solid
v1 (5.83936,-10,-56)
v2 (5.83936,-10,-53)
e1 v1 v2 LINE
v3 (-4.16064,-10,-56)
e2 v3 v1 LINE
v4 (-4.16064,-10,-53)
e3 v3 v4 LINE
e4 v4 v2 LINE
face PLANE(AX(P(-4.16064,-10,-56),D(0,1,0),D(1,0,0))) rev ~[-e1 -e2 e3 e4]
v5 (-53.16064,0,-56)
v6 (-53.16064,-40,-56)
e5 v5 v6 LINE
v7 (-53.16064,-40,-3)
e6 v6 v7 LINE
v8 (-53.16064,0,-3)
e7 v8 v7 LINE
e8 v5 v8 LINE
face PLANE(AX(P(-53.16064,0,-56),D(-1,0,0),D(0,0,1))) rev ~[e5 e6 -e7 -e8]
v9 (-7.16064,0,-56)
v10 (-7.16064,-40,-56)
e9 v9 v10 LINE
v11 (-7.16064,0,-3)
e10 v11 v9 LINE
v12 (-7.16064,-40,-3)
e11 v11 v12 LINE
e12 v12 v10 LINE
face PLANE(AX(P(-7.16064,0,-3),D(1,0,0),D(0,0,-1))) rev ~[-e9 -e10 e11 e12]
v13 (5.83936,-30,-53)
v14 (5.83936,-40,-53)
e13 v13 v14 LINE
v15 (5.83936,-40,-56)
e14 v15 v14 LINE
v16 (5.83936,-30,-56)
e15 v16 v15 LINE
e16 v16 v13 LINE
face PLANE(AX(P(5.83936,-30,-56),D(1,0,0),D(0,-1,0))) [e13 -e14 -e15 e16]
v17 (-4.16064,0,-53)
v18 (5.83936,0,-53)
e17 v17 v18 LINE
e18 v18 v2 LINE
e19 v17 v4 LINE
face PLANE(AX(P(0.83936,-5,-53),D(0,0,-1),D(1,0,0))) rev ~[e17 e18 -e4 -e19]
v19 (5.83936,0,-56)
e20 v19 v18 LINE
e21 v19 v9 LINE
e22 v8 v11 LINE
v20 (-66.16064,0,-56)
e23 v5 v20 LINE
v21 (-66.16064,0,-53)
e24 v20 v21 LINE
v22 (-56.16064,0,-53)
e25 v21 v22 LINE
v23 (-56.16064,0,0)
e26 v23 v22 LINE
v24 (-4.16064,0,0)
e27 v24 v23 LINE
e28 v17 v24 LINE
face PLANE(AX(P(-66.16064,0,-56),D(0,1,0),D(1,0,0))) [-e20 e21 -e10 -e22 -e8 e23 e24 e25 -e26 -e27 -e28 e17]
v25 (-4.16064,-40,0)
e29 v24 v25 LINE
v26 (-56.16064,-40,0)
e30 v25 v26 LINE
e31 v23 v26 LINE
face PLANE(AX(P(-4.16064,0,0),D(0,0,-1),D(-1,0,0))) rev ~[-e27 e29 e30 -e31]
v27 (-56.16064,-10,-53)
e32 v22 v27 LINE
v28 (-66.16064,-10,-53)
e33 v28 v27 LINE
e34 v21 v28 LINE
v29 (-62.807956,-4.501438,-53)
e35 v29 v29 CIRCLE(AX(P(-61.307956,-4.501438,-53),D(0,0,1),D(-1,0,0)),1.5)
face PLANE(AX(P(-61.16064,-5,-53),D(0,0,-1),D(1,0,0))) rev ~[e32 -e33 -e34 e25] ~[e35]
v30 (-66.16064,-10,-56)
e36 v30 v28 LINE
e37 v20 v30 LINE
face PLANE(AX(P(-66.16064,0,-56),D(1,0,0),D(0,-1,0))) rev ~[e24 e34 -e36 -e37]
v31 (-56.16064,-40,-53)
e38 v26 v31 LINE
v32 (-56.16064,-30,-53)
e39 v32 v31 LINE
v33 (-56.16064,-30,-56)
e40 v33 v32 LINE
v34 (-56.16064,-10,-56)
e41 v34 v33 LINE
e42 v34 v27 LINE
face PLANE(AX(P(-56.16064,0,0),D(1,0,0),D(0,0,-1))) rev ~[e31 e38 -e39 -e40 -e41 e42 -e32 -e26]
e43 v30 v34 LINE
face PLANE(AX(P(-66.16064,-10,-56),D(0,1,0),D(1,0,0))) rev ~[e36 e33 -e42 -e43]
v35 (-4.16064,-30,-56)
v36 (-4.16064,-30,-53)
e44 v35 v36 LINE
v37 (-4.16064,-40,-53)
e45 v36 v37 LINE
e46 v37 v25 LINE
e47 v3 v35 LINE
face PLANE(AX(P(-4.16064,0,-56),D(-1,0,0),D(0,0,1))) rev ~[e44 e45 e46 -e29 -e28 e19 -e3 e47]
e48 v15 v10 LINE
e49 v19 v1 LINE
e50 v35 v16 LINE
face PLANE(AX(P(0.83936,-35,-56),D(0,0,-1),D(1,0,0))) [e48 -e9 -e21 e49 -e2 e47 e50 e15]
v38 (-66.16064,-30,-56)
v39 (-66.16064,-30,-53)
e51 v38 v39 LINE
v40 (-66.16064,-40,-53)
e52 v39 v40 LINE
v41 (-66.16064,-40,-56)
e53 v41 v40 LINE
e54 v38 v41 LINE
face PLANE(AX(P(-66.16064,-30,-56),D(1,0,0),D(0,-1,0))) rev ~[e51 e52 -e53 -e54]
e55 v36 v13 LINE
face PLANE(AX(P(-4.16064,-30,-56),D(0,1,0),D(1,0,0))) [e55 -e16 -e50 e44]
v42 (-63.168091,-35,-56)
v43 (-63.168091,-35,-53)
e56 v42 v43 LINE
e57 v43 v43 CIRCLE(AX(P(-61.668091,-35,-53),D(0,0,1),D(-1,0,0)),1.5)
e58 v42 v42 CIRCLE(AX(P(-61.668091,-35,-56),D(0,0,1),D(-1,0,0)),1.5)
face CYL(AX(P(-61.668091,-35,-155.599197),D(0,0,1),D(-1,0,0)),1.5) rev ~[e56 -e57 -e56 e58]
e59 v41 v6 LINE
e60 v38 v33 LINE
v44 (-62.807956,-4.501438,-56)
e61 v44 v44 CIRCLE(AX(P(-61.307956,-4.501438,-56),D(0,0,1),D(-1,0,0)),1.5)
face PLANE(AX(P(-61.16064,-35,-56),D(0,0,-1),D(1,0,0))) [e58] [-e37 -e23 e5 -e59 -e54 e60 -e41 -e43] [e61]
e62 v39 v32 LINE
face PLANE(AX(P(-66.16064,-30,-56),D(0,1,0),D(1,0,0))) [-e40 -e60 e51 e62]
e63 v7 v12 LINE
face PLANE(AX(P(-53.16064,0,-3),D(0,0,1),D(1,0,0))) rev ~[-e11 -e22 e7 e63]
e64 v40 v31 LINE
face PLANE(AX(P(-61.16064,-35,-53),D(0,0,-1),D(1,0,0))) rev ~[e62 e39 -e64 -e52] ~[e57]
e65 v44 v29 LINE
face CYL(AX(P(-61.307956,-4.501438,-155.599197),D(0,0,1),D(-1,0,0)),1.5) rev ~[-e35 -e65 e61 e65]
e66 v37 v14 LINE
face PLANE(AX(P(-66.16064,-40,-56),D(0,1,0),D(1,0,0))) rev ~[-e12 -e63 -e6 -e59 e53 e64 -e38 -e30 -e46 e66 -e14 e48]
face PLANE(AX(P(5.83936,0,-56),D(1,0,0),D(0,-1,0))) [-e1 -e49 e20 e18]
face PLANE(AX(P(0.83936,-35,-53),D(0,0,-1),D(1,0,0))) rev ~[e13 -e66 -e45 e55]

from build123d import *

# Parameters (mm, degrees)
F1_DEPTH = 40
F3_W     = 10
F3_H     = 10
F4_DEPTH = 3
F2_W     = 10
F2_H     = 10
F5_DEPTH = 3
F6_W     = 10
F6_H     = 10
F7_DEPTH = 3
F8_W     = 10
F8_H     = 10
F9_DEPTH = 3
F11_D    = 3


# Not quite as in the source:
# - a feature of the source that left no trace in its solid (it failed there, or was rolled back) is left out
# - a feature names something its author has since deleted; it is built from what else it names


with BuildPart() as f1:
    # F0 (on Front) → F1 (new body)
    with BuildSketch(Plane.XZ):
        Polygon((-56.1606403851, 0), (-56.1606403851, -56), (-53.1606403851, -56), (-53.1606403851, -3), (-7.1606403851, -3), (-7.1606403851, -56), (-4.1606403851, -56), (-4.1606403851, 0), align=None)
    extrude(amount=F1_DEPTH)

    # F3 (on face) → F4 (join)
    with BuildSketch(Plane(origin=(0, 0, -56), x_dir=(1, 0, 0), z_dir=(0, 0, -1))):
        with Locations((0.8393596149, 5)):
            Rectangle(F3_W, F3_H)
    extrude(amount=-F4_DEPTH)

    # F2 (on face) → F5 (join)
    with BuildSketch(Plane(origin=(0, 0, -56), x_dir=(1, 0, 0), z_dir=(0, 0, -1))):
        with Locations((-61.1606403851, 5)):
            Rectangle(F2_W, F2_H)
    extrude(amount=-F5_DEPTH)

    # F6 (on face) → F7 (join)
    with BuildSketch(Plane(origin=(0, 0, -56), x_dir=(1, 0, 0), z_dir=(0, 0, -1))):
        with Locations((0.8393596149, 35)):
            Rectangle(F6_W, F6_H)
    extrude(amount=-F7_DEPTH)

    # F8 (on face) → F9 (join)
    with BuildSketch(Plane(origin=(0, 0, -56), x_dir=(1, 0, 0), z_dir=(0, 0, -1))):
        with Locations((-61.1606403851, 35)):
            Rectangle(F8_W, F8_H)
    extrude(amount=-F9_DEPTH)

    # F11 (through all)
    with Locations(Plane(origin=(0, 0, -56), x_dir=(1, 0, 0), z_dir=(0, 0, -1))):
        with Locations((-61.6680905223, 35), (18.8430529088, 95.1308980584), (-61.3079555333, 4.5014377683), (19.3945541978, 4.6852682717)):
            Hole(F11_D / 2)


solid = f1.part
